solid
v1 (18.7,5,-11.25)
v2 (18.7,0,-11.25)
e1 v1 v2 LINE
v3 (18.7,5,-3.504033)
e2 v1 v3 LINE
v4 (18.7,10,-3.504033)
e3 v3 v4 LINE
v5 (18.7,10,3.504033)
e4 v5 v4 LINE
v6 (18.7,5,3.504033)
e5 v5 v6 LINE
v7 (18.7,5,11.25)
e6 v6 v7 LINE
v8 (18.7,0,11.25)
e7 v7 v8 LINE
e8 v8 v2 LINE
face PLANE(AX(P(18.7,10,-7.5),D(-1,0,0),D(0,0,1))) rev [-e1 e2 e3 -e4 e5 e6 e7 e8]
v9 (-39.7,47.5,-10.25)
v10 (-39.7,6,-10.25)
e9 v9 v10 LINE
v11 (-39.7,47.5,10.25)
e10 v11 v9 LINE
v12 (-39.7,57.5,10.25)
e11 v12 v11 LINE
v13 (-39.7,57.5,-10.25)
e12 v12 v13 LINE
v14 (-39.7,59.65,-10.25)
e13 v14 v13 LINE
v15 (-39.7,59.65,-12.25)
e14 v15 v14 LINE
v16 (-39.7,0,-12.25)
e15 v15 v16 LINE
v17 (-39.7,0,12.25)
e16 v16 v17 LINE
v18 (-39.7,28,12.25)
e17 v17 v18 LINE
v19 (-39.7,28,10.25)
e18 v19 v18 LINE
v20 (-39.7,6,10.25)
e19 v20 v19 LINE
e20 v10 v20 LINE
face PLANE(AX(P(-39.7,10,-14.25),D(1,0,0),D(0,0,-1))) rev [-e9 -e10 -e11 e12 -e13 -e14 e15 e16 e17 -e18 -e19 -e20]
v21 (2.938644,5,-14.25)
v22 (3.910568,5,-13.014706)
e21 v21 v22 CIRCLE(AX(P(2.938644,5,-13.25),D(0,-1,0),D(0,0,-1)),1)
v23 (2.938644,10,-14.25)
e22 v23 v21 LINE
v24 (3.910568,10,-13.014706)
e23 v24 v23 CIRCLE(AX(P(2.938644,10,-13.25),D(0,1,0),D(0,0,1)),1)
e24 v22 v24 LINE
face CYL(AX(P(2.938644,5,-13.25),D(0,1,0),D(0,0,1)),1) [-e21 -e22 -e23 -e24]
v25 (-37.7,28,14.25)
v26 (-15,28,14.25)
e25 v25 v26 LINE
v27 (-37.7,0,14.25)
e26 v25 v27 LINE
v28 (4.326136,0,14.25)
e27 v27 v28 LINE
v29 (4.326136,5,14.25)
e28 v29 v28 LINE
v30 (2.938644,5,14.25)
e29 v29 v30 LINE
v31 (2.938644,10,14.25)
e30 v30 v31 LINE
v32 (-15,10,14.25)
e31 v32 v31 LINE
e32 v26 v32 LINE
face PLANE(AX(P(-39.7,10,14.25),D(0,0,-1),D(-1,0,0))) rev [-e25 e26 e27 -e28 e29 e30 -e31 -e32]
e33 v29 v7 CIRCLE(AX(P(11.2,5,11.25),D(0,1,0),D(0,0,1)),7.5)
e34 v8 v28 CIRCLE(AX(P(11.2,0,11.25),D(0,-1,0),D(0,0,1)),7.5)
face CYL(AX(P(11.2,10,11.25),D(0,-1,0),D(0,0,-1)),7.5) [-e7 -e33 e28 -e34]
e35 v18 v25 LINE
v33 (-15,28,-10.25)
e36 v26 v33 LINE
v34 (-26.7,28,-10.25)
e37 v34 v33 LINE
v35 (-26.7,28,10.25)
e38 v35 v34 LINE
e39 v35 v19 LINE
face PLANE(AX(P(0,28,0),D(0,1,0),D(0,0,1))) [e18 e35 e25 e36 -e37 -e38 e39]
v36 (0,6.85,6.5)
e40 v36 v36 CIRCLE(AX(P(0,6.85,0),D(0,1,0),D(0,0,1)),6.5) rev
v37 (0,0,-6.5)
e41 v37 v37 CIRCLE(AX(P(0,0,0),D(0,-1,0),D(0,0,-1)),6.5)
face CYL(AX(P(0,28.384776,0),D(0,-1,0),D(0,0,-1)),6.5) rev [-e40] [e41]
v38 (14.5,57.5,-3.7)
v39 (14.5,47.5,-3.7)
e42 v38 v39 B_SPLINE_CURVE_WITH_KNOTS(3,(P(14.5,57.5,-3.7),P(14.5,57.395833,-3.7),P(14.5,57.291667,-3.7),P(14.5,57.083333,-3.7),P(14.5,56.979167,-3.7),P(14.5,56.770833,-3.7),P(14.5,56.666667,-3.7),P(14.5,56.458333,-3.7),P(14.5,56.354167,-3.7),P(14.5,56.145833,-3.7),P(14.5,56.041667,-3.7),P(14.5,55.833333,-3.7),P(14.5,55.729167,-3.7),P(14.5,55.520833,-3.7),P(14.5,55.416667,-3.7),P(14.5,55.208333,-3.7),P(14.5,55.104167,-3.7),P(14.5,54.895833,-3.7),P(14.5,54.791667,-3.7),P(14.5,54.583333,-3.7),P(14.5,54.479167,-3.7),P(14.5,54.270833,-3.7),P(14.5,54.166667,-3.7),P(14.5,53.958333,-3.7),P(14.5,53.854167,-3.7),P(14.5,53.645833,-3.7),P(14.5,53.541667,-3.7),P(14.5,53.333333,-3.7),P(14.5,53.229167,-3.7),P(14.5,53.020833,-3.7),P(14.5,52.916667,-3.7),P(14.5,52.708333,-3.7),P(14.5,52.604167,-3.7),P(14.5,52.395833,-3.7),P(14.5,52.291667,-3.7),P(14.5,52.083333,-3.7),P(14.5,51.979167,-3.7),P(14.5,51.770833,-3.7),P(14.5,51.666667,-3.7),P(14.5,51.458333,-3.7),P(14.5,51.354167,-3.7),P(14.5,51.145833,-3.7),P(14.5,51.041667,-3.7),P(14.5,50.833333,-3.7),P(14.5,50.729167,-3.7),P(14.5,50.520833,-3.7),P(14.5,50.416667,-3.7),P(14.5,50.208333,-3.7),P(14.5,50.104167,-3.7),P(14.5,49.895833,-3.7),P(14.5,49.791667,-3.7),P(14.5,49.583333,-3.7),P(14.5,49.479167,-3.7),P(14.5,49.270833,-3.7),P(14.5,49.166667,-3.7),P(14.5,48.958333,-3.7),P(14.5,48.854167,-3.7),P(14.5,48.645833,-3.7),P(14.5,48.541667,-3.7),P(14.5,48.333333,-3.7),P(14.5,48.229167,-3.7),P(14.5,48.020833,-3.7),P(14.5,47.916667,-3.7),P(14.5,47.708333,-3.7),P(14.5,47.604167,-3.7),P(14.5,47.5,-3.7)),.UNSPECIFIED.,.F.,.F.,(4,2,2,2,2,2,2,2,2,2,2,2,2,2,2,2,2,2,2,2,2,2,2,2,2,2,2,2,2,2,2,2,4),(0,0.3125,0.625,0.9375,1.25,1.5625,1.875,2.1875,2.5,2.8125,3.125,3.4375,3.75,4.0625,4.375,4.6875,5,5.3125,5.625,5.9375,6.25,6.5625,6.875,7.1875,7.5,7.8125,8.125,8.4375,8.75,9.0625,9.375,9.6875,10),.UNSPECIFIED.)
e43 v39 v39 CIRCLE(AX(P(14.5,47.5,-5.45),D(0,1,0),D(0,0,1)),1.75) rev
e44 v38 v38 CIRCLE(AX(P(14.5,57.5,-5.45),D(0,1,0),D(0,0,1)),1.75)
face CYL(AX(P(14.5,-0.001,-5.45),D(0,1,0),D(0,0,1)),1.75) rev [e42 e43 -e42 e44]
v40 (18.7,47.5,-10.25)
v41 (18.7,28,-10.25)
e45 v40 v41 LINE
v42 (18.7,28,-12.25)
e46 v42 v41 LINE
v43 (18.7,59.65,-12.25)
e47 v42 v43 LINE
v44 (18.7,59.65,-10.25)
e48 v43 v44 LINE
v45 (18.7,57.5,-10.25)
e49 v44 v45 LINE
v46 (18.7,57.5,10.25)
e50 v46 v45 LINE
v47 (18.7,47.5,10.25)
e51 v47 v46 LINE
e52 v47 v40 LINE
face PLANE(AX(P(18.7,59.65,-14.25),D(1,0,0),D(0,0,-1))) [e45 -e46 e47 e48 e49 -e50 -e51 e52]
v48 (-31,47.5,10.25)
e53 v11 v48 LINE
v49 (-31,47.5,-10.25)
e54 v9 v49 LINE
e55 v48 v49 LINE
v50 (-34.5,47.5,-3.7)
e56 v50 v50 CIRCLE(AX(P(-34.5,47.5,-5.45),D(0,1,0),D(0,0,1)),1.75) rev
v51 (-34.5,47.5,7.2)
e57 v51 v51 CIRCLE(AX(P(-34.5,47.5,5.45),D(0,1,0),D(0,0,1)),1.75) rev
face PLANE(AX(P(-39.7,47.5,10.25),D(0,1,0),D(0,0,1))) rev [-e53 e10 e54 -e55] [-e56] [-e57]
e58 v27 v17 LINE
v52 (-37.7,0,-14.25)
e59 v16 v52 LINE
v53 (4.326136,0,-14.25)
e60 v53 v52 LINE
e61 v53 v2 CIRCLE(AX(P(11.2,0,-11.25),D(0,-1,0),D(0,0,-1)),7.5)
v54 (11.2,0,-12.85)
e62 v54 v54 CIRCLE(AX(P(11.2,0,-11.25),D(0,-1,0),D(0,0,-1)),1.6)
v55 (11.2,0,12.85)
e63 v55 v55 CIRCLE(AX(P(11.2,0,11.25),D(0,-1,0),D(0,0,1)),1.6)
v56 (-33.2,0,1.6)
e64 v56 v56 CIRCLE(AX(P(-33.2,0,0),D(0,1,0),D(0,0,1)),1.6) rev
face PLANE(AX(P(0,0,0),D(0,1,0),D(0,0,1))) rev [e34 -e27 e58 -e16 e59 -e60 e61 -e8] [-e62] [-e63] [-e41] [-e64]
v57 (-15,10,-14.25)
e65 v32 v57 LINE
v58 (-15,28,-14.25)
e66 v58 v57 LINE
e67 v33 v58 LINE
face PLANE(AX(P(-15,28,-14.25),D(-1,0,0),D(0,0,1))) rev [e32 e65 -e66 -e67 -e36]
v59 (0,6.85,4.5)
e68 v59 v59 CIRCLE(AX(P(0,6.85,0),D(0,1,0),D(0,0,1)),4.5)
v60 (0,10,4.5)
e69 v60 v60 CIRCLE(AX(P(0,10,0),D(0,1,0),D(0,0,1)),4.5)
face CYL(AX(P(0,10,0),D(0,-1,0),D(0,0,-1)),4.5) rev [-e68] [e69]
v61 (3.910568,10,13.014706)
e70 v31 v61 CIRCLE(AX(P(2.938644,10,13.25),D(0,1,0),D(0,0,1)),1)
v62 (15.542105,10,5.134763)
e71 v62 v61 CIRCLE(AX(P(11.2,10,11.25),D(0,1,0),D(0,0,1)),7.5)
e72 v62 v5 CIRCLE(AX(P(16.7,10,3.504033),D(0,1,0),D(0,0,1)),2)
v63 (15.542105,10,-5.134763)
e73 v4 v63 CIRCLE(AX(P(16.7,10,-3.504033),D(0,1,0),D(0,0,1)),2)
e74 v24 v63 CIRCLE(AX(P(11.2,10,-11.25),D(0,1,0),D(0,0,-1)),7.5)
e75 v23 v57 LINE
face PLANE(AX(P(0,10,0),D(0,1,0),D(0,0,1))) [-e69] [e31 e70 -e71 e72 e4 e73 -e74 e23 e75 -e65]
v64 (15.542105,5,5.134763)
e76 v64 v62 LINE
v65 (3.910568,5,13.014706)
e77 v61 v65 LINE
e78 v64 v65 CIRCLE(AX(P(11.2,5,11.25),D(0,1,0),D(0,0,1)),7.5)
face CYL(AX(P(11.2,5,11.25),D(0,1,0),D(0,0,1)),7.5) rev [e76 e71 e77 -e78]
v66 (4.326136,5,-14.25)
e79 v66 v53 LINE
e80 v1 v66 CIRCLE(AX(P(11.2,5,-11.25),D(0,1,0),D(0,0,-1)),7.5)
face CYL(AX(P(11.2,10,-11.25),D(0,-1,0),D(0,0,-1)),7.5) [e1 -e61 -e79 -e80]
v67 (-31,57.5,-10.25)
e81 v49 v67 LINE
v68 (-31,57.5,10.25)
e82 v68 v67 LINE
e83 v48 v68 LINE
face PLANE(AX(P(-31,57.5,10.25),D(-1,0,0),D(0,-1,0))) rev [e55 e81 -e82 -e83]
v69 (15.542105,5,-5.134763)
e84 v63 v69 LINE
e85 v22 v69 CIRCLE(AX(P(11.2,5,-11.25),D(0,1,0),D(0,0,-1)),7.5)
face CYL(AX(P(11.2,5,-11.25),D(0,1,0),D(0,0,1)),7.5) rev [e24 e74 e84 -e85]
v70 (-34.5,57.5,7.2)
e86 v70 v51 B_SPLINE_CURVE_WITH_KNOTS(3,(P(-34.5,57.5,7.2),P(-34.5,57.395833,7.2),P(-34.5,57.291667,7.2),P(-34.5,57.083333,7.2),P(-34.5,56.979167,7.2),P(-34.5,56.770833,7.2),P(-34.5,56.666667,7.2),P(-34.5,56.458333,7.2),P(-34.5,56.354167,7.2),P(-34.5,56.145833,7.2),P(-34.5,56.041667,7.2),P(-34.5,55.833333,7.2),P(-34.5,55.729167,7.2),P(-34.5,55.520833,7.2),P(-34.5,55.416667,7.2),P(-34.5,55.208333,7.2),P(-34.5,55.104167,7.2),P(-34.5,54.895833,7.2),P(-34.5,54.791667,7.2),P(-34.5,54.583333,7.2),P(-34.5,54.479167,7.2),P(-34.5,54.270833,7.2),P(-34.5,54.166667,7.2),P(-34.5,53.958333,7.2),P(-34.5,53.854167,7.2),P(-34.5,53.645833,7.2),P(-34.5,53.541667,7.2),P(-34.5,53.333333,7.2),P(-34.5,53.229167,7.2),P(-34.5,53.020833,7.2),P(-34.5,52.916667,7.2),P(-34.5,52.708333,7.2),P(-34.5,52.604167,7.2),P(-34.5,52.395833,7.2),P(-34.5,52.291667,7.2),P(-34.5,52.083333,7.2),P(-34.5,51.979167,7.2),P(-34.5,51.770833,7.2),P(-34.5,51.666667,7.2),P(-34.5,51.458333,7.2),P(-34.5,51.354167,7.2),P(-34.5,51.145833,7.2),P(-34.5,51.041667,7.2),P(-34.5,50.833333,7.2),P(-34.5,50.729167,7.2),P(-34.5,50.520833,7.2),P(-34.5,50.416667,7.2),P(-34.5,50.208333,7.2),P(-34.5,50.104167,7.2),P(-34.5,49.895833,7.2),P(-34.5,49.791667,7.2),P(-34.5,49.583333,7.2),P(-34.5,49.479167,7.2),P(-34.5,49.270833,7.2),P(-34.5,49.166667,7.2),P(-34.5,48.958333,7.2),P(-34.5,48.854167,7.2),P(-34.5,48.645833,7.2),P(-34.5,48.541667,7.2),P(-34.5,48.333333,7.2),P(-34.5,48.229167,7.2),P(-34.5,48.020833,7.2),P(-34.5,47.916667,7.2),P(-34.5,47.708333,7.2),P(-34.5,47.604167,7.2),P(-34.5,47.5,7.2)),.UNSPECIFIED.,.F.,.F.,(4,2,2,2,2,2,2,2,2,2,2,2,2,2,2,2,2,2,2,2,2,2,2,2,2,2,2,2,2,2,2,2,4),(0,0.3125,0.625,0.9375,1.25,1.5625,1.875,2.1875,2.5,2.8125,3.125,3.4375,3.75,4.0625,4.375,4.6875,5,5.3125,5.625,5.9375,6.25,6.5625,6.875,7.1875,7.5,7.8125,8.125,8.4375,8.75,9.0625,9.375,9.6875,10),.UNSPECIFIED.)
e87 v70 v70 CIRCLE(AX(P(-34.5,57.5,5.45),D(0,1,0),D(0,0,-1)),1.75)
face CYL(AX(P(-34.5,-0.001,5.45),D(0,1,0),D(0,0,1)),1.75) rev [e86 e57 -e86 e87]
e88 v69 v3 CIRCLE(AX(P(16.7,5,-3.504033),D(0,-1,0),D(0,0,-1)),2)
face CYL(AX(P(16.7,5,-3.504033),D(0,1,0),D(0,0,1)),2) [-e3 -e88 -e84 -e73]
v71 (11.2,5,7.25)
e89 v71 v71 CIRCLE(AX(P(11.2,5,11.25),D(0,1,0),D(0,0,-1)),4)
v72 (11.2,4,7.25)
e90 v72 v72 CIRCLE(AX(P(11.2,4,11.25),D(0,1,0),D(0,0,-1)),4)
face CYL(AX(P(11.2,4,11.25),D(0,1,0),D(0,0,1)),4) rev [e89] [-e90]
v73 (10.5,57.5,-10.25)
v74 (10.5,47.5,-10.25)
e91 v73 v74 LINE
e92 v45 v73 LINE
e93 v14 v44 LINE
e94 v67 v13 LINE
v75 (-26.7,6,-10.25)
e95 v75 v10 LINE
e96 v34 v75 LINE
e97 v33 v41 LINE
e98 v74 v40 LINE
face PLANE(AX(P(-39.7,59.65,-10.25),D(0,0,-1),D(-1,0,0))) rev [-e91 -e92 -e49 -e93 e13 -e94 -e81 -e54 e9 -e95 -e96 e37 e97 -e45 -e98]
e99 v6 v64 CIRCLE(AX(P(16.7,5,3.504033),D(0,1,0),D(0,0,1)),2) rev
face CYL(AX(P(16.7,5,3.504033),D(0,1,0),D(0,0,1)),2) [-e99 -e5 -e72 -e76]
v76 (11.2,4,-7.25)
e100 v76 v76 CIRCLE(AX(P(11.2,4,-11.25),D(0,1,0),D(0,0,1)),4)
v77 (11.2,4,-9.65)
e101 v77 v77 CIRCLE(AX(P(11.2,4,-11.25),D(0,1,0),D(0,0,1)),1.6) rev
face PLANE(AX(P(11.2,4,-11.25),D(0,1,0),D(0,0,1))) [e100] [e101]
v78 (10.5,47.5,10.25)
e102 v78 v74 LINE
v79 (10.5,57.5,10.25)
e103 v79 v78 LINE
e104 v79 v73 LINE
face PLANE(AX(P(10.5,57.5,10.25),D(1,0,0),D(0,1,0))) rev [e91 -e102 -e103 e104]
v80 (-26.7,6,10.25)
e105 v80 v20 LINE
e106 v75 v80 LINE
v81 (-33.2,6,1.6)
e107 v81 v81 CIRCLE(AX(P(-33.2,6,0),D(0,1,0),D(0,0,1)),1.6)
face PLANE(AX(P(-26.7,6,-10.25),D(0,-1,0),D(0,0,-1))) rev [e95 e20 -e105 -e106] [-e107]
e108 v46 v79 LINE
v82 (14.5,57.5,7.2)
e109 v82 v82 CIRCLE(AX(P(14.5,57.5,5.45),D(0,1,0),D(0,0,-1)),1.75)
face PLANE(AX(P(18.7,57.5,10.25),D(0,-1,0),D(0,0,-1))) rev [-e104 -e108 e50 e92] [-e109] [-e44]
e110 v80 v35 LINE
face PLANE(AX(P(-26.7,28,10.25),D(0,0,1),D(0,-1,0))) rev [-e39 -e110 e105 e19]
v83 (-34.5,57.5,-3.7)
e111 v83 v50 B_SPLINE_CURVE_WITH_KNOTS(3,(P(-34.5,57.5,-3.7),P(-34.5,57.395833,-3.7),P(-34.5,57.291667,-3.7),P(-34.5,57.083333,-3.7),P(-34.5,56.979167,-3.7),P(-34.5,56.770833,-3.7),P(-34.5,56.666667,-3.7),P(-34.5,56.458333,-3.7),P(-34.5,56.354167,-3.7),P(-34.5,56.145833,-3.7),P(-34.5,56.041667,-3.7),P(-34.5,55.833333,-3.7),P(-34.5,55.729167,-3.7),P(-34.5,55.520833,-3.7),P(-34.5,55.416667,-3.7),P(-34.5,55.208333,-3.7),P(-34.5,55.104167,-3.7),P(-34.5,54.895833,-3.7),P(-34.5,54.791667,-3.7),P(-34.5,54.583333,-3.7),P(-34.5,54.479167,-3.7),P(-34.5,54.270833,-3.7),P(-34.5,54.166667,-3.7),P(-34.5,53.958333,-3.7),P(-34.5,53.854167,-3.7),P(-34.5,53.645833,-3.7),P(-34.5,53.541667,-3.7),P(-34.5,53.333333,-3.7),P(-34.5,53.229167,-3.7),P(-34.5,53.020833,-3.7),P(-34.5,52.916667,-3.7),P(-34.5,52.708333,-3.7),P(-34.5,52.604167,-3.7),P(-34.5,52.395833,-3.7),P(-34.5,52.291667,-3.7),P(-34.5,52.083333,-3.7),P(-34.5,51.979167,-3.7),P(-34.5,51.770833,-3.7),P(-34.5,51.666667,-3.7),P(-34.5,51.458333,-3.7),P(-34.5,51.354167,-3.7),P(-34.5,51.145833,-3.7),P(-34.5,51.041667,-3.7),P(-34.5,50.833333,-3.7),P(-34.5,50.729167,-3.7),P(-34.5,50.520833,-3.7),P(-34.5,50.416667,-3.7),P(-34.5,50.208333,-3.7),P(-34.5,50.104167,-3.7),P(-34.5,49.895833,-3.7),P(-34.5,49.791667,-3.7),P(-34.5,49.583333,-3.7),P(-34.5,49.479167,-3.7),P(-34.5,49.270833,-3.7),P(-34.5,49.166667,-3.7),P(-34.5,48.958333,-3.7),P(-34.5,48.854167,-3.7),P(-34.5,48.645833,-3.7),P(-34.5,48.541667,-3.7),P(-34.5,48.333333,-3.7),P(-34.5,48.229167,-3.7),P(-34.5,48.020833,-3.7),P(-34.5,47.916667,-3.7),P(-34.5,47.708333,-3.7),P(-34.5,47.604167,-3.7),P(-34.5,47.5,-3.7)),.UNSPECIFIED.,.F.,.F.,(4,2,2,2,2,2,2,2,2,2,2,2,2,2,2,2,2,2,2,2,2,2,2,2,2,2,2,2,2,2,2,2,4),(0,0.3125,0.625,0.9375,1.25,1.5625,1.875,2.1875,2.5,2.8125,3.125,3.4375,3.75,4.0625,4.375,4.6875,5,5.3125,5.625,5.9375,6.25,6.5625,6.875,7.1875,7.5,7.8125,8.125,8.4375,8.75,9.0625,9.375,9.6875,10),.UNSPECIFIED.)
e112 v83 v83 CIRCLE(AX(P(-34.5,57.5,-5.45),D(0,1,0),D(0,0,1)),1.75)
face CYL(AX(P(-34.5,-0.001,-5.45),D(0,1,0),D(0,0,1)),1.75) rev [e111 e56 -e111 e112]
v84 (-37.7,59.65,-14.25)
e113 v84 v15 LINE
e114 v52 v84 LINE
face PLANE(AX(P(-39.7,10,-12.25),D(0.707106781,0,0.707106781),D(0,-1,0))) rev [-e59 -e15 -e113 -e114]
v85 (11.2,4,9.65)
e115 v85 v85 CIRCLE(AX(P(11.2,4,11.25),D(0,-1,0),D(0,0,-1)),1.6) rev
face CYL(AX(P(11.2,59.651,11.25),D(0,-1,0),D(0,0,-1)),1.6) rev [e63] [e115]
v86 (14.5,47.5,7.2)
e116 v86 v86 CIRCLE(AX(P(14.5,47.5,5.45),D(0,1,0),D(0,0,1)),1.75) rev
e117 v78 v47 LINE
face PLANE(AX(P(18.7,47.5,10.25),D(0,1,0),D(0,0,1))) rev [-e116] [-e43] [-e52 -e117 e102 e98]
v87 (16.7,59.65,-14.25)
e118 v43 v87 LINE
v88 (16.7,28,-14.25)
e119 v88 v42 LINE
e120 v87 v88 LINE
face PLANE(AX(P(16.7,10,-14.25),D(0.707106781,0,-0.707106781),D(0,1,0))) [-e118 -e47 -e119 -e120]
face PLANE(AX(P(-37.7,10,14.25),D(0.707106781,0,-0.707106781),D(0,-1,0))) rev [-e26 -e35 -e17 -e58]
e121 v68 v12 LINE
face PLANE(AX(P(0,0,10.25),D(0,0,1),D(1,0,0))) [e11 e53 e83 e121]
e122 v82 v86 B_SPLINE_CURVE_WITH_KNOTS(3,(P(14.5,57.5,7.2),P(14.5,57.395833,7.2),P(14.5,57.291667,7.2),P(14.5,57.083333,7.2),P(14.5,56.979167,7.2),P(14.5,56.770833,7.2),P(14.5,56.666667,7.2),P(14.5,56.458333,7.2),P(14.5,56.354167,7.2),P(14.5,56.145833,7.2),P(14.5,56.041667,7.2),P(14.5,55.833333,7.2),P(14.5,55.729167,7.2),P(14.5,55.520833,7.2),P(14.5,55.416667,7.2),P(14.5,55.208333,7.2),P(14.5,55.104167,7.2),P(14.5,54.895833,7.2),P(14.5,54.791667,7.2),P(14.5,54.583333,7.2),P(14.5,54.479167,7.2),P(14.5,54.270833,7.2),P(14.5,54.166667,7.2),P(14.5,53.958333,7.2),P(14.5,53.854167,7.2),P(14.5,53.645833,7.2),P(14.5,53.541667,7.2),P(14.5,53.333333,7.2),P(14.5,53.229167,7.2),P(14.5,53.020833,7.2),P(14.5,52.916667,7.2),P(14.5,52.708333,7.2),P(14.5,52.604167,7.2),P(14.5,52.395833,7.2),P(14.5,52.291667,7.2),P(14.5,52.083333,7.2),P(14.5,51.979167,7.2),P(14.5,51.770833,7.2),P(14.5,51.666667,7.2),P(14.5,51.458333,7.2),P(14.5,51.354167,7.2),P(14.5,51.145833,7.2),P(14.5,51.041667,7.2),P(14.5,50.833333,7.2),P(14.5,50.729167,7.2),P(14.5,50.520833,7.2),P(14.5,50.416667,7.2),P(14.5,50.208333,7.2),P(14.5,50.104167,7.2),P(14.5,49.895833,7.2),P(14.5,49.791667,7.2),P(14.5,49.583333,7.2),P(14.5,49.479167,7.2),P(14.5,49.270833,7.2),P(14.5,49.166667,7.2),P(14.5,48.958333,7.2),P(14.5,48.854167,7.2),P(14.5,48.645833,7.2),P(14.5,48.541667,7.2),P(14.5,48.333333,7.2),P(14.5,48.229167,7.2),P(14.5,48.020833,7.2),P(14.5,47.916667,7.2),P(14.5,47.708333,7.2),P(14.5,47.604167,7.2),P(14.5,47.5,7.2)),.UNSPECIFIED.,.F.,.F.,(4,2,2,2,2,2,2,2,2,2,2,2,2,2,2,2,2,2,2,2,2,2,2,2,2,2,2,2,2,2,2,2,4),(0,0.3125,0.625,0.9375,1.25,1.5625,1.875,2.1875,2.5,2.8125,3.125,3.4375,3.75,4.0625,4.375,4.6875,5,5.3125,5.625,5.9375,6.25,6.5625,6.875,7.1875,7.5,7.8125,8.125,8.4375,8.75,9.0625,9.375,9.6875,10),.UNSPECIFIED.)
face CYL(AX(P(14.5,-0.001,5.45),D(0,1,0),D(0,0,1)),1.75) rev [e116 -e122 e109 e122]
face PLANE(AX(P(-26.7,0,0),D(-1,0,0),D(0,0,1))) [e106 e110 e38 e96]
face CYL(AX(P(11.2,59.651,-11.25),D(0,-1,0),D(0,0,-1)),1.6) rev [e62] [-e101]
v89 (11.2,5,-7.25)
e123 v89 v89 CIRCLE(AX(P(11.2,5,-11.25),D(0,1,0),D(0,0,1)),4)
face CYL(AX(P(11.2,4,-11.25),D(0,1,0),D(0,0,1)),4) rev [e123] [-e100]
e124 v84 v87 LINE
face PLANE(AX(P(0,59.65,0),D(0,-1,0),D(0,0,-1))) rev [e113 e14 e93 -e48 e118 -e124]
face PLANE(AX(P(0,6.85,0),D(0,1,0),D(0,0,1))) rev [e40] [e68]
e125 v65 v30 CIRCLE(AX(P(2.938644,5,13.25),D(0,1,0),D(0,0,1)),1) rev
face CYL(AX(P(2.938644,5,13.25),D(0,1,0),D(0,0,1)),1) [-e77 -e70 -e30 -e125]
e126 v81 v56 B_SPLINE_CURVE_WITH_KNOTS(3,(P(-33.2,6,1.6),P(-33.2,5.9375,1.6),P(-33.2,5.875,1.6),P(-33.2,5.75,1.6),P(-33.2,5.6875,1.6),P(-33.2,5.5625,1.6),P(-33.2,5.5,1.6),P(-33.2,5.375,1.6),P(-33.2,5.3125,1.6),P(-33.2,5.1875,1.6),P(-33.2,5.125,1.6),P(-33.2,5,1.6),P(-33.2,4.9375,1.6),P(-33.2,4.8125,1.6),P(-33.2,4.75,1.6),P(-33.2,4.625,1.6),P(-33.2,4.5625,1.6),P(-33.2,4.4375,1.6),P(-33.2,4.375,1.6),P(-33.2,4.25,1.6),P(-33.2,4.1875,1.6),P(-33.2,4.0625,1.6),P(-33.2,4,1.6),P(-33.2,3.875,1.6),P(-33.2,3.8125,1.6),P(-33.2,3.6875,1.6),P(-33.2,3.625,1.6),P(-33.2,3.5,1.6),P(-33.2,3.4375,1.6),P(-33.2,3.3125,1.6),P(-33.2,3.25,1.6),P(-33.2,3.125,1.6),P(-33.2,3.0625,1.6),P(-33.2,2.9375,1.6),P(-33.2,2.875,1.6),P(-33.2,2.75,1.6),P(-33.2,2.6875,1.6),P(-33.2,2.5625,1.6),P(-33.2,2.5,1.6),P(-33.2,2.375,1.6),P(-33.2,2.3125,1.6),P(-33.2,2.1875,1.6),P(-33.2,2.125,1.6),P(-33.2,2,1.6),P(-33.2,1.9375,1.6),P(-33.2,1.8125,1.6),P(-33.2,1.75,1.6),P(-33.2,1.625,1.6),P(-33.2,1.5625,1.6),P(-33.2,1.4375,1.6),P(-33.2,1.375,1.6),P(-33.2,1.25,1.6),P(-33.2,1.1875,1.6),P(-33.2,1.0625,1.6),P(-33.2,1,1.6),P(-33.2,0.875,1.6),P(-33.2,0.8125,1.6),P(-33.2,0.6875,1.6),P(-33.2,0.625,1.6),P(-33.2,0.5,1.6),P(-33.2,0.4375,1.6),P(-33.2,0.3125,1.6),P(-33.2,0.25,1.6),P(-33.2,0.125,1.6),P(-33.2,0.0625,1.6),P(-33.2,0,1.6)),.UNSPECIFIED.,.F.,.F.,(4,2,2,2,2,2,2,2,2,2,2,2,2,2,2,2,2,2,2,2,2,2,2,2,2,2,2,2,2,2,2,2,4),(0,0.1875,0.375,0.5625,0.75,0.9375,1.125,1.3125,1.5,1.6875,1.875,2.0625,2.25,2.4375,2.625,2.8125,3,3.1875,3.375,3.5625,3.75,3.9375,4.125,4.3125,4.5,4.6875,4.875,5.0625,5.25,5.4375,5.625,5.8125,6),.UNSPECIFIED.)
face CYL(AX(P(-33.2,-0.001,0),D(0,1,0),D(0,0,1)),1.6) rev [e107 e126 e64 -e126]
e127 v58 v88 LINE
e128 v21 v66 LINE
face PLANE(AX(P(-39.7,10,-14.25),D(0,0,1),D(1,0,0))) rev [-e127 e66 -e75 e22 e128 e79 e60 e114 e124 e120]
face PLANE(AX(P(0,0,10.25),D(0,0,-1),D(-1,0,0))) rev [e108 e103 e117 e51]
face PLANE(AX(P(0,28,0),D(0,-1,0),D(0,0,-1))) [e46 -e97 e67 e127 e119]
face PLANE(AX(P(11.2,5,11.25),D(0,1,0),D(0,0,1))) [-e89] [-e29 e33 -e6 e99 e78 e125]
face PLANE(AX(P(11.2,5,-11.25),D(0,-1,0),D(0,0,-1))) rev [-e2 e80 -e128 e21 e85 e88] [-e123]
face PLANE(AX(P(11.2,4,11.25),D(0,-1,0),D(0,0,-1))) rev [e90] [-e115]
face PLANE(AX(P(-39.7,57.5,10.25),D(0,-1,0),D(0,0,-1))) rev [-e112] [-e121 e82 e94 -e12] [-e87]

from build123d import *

# Parameters (mm, degrees)
SZKIC1_R                    = 4.5
DODANIE_WYCI_GNI_CIE1_DEPTH = 10
SZKIC3_R                    = 6.5
WYTNIJ_WYCI_GNI_CIE9_DEPTH  = 6.85
DODANIE_WYCI_GNI_CIE2_DEPTH = 18
DODANIE_WYCI_GNI_CIE3_DEPTH = 31.65
DODANIE_WYCI_GNI_CIE4_DEPTH = 20.5
WYTNIJ_WYCI_GNI_CIE3_REACH  = 73.312
SZKIC8_R                    = 1.7500000000000036
SZKIC8_R_2                  = 1.7499999999999982
SFAZOWANIE1_SIZE            = 2
DODANIE_WYCI_GNI_CIE5_DEPTH = 10
WYTNIJ_WYCI_GNI_CIE4_REACH  = 76.066
SZKIC12_R                   = 1.6000000000000019
WYTNIJ_WYCI_GNI_CIE6_START  = -5
SZKIC14_R                   = 7.499999999999999
WYTNIJ_WYCI_GNI_CIE6_DEPTH  = 5
SZKIC13_R                   = 4.000000000000001
WYTNIJ_WYCI_GNI_CIE5_DEPTH  = 1
ZAOKR_GLENIE1_R             = 2
ZAOKR_GLENIE2_R             = 1
WYTNIJ_WYCI_GNI_CIE7_DEPTH  = 13
WYTNIJ_WYCI_GNI_CIE8_REACH  = 71.325
SZKIC16_R                   = 1.599999999999998


with BuildPart() as part:
    # Szkic1 → Dodanie-wyciągnięcie1 (new body)
    with BuildSketch(Plane(origin=(0, 0, 0), x_dir=(1, 0, 0), z_dir=(0, 1, 0))):
        Polygon((-39.699999999999996, 14.25), (11.950000000000069, 14.25), (18.7, 7.5), (18.7, -7.5), (11.95000000000007, -14.25), (-39.699999999999996, -14.25), align=None)
        with Locations(Location((0, 0, 0), (0, 0, 270))):
            Circle(SZKIC1_R, mode=Mode.SUBTRACT)
    extrude(amount=DODANIE_WYCI_GNI_CIE1_DEPTH)

    # Szkic3 → Wytnij-wyciągnięcie9 (cut)
    with BuildSketch(Plane.XZ):
        with Locations(Location((0, 0, 0), (0, 0, 270))):
            Circle(SZKIC3_R)
    extrude(amount=-WYTNIJ_WYCI_GNI_CIE9_DEPTH, mode=Mode.SUBTRACT)

    # Szkic4 → Dodanie-wyciągnięcie2 (add)
    with BuildSketch(Plane(origin=(0, 10, 0), x_dir=(1, 0, 0), z_dir=(0, 1, 0))):
        Polygon((-39.699999999999996, 14.25), (-15, 14.25), (-14.999999999999996, -14.25), (-39.699999999999996, -14.25), align=None)
    extrude(amount=DODANIE_WYCI_GNI_CIE2_DEPTH)

    # Szkic6 → Dodanie-wyciągnięcie3 (add)
    with BuildSketch(Plane(origin=(0, 27.999999999999996, 0), x_dir=(1, 0, 0), z_dir=(0, 1, 0))):
        Polygon((-39.699999999999996, 14.25), (18.699999999999996, 14.25), (18.7, 10.25), (-39.699999999999996, 10.25), align=None)
    extrude(amount=DODANIE_WYCI_GNI_CIE3_DEPTH)

    # Szkic7 → Dodanie-wyciągnięcie4 (add)
    with BuildSketch(Plane.XY.offset(-10.25)):
        Polygon((18.7, 57.49999999999999), (10.499999999999995, 57.49999999999999), (10.499999999999996, 47.49999999999999), (18.7, 47.49999999999999), align=None)
        Polygon((-39.699999999999996, 57.499999999999986), (-31.000000000000007, 57.499999999999986), (-31.000000000000004, 47.499999999999986), (-39.699999999999996, 47.499999999999986), align=None)
    extrude(amount=DODANIE_WYCI_GNI_CIE4_DEPTH)

    # Szkic8 → Wytnij-wyciągnięcie3 (cut, up to next)
    with BuildSketch(Plane(origin=(0, 57.499999999999986, 0), x_dir=(1, 0, 0), z_dir=(0, 1, 0)), mode=Mode.PRIVATE) as wytnij_wyci_gni_cie3_sk1:
        with Locations(Location((-34.5, 5.450000000000001, 0), (0, 0, 270))):
            Circle(SZKIC8_R)
    wytnij_wyci_gni_cie3_tool1 = extrude(wytnij_wyci_gni_cie3_sk1.sketch, amount=-WYTNIJ_WYCI_GNI_CIE3_REACH, mode=Mode.PRIVATE) & part.part
    # Szkic8 → Wytnij-wyciągnięcie3 (cut, up to next)
    with BuildSketch(Plane(origin=(0, 57.499999999999986, 0), x_dir=(1, 0, 0), z_dir=(0, 1, 0)), mode=Mode.PRIVATE) as wytnij_wyci_gni_cie3_sk2:
        with Locations(Location((14.5, 5.450000000000002, 0), (0, 0, 270))):
            Circle(SZKIC8_R_2)
    wytnij_wyci_gni_cie3_tool2 = extrude(wytnij_wyci_gni_cie3_sk2.sketch, amount=-WYTNIJ_WYCI_GNI_CIE3_REACH, mode=Mode.PRIVATE) & part.part
    # Szkic8 → Wytnij-wyciągnięcie3 (cut, up to next)
    with BuildSketch(Plane(origin=(0, 57.499999999999986, 0), x_dir=(1, 0, 0), z_dir=(0, 1, 0)), mode=Mode.PRIVATE) as wytnij_wyci_gni_cie3_sk3:
        with Locations(Location((14.5, -5.450000000000002, 0), (0, 0, 270))):
            Circle(SZKIC8_R_2)
    wytnij_wyci_gni_cie3_tool3 = extrude(wytnij_wyci_gni_cie3_sk3.sketch, amount=-WYTNIJ_WYCI_GNI_CIE3_REACH, mode=Mode.PRIVATE) & part.part
    # Szkic8 → Wytnij-wyciągnięcie3 (cut, up to next)
    with BuildSketch(Plane(origin=(0, 57.499999999999986, 0), x_dir=(1, 0, 0), z_dir=(0, 1, 0)), mode=Mode.PRIVATE) as wytnij_wyci_gni_cie3_sk4:
        with Locations(Location((-34.5, -5.450000000000001, 0), (0, 0, 270))):
            Circle(SZKIC8_R)
    wytnij_wyci_gni_cie3_tool4 = extrude(wytnij_wyci_gni_cie3_sk4.sketch, amount=-WYTNIJ_WYCI_GNI_CIE3_REACH, mode=Mode.PRIVATE) & part.part
    add(wytnij_wyci_gni_cie3_tool1.solids().sort_by_distance((-34.5, 57.5, -5.45))[0], mode=Mode.SUBTRACT)
    add(wytnij_wyci_gni_cie3_tool2.solids().sort_by_distance((14.5, 57.5, -5.45))[0], mode=Mode.SUBTRACT)
    add(wytnij_wyci_gni_cie3_tool3.solids().sort_by_distance((14.5, 57.5, 5.45))[0], mode=Mode.SUBTRACT)
    add(wytnij_wyci_gni_cie3_tool4.solids().sort_by_distance((-34.5, 57.5, 5.45))[0], mode=Mode.SUBTRACT)

    # Sfazowanie1
    sfazowanie1_edges = [part.edges().sort_by_distance(p)[0] for p in [
        (-39.699999999999996, 29.824999999999996, -14.25),
        (-39.699999999999996, 14, 14.25),
        (18.699999999999996, 43.824999999999996, -14.25),
    ]]
    chamfer(sfazowanie1_edges, length=SFAZOWANIE1_SIZE)

    # Szkic9 → Dodanie-wyciągnięcie5 (add)
    with BuildSketch(Plane.XZ):
        with BuildLine():
            Line((18.7, -7.5), (11.950000000000069, -14.25))
            Line((11.950000000000069, -14.25), (4.326136457566238, -14.249999999999998))
            ThreePointArc((4.326136457566238, -14.249999999999998), (12.732322327669147, -18.59179734698027), (18.7, -11.25))
            Line((18.7, -11.25), (18.7, -7.5))
        make_face()
        with BuildLine():
            Line((18.7, 7.5), (18.7, 11.25))
            ThreePointArc((18.7, 11.25), (12.732322327669147, 18.59179734698027), (4.326136457566238, 14.249999999999998))
            Line((4.326136457566238, 14.249999999999998), (11.950000000000069, 14.25))
            Line((11.950000000000069, 14.25), (18.7, 7.5))
        make_face()
    extrude(amount=-DODANIE_WYCI_GNI_CIE5_DEPTH)

    # Szkic12 → Wytnij-wyciągnięcie4 (cut, up to next)
    with BuildSketch(Plane.XZ, mode=Mode.PRIVATE) as wytnij_wyci_gni_cie4_sk1:
        with Locations(Location((11.199999999999998, -11.25, 0), (0, 0, 270))):
            Circle(SZKIC12_R)
    wytnij_wyci_gni_cie4_tool1 = extrude(wytnij_wyci_gni_cie4_sk1.sketch, amount=-WYTNIJ_WYCI_GNI_CIE4_REACH, mode=Mode.PRIVATE) & part.part
    # Szkic12 → Wytnij-wyciągnięcie4 (cut, up to next)
    with BuildSketch(Plane.XZ, mode=Mode.PRIVATE) as wytnij_wyci_gni_cie4_sk2:
        with Locations(Location((11.199999999999998, 11.25, 0), (0, 0, 90))):
            Circle(SZKIC12_R)
    wytnij_wyci_gni_cie4_tool2 = extrude(wytnij_wyci_gni_cie4_sk2.sketch, amount=-WYTNIJ_WYCI_GNI_CIE4_REACH, mode=Mode.PRIVATE) & part.part
    add(wytnij_wyci_gni_cie4_tool1.solids().sort_by_distance((11.2, 0, -11.25))[0], mode=Mode.SUBTRACT)
    add(wytnij_wyci_gni_cie4_tool2.solids().sort_by_distance((11.2, 0, 11.25))[0], mode=Mode.SUBTRACT)

    # Szkic14 → Wytnij-wyciągnięcie6 (cut)
    with BuildSketch(Plane(origin=(0, 10, 0), x_dir=(1, 0, 0), z_dir=(0, 1, 0)).offset(WYTNIJ_WYCI_GNI_CIE6_START)):
        with Locations((11.199999999999998, -11.25)):
            Circle(SZKIC14_R)
        with Locations((11.199999999999998, 11.25)):
            Circle(SZKIC14_R)
    extrude(amount=WYTNIJ_WYCI_GNI_CIE6_DEPTH, mode=Mode.SUBTRACT)

    # Szkic13 → Wytnij-wyciągnięcie5 (cut)
    with BuildSketch(Plane(origin=(0, 5, 0), x_dir=(1, 0, 0), z_dir=(0, 1, 0))):
        with Locations(Location((11.199999999999998, 11.25, 0), (0, 0, 270))):
            Circle(SZKIC13_R)
        with Locations(Location((11.199999999999998, -11.25, 0), (0, 0, 90))):
            Circle(SZKIC13_R)
    extrude(amount=-WYTNIJ_WYCI_GNI_CIE5_DEPTH, mode=Mode.SUBTRACT)

    # Zaokrąglenie1
    zaokr_glenie1_edges = [part.edges().sort_by_distance(p)[0] for p in [
        (18.700000000000003, 7.5, 11.25),
        (18.7, 7.5, -11.25),
    ]]
    fillet(zaokr_glenie1_edges, radius=ZAOKR_GLENIE1_R - 0.0001)  # a hair under: the kernel refuses the full size

    # Zaokrąglenie2
    zaokr_glenie2_edges = [part.edges().sort_by_distance(p)[0] for p in [
        (4.326136457566238, 7.5, 14.25),
        (4.326136457566238, 7.5, -14.249999999999998),
    ]]
    fillet(zaokr_glenie2_edges, radius=ZAOKR_GLENIE2_R)

    # Szkic15 → Wytnij-wyciągnięcie7 (cut)
    with BuildSketch(Plane.ZY.offset(39.699999999999996)):
        Polygon((-10.25, 27.999999999999996), (10.25, 27.999999999999996), (10.250000000000002, 6), (-10.25, 6), align=None)
    extrude(amount=-WYTNIJ_WYCI_GNI_CIE7_DEPTH, mode=Mode.SUBTRACT)

    # Szkic16 → Wytnij-wyciągnięcie8 (cut, up to next)
    with BuildSketch(Plane(origin=(0, 6, 0), x_dir=(1, 0, 0), z_dir=(0, 1, 0)), mode=Mode.PRIVATE) as wytnij_wyci_gni_cie8_sk1:
        with Locations(Location((-33.2, 0, 0), (0, 0, 270))):
            Circle(SZKIC16_R)
    wytnij_wyci_gni_cie8_tool1 = extrude(wytnij_wyci_gni_cie8_sk1.sketch, amount=-WYTNIJ_WYCI_GNI_CIE8_REACH, mode=Mode.PRIVATE) & part.part
    add(wytnij_wyci_gni_cie8_tool1.solids().sort_by_distance((-33.2, 6, 0))[0], mode=Mode.SUBTRACT)


solid = part.part
